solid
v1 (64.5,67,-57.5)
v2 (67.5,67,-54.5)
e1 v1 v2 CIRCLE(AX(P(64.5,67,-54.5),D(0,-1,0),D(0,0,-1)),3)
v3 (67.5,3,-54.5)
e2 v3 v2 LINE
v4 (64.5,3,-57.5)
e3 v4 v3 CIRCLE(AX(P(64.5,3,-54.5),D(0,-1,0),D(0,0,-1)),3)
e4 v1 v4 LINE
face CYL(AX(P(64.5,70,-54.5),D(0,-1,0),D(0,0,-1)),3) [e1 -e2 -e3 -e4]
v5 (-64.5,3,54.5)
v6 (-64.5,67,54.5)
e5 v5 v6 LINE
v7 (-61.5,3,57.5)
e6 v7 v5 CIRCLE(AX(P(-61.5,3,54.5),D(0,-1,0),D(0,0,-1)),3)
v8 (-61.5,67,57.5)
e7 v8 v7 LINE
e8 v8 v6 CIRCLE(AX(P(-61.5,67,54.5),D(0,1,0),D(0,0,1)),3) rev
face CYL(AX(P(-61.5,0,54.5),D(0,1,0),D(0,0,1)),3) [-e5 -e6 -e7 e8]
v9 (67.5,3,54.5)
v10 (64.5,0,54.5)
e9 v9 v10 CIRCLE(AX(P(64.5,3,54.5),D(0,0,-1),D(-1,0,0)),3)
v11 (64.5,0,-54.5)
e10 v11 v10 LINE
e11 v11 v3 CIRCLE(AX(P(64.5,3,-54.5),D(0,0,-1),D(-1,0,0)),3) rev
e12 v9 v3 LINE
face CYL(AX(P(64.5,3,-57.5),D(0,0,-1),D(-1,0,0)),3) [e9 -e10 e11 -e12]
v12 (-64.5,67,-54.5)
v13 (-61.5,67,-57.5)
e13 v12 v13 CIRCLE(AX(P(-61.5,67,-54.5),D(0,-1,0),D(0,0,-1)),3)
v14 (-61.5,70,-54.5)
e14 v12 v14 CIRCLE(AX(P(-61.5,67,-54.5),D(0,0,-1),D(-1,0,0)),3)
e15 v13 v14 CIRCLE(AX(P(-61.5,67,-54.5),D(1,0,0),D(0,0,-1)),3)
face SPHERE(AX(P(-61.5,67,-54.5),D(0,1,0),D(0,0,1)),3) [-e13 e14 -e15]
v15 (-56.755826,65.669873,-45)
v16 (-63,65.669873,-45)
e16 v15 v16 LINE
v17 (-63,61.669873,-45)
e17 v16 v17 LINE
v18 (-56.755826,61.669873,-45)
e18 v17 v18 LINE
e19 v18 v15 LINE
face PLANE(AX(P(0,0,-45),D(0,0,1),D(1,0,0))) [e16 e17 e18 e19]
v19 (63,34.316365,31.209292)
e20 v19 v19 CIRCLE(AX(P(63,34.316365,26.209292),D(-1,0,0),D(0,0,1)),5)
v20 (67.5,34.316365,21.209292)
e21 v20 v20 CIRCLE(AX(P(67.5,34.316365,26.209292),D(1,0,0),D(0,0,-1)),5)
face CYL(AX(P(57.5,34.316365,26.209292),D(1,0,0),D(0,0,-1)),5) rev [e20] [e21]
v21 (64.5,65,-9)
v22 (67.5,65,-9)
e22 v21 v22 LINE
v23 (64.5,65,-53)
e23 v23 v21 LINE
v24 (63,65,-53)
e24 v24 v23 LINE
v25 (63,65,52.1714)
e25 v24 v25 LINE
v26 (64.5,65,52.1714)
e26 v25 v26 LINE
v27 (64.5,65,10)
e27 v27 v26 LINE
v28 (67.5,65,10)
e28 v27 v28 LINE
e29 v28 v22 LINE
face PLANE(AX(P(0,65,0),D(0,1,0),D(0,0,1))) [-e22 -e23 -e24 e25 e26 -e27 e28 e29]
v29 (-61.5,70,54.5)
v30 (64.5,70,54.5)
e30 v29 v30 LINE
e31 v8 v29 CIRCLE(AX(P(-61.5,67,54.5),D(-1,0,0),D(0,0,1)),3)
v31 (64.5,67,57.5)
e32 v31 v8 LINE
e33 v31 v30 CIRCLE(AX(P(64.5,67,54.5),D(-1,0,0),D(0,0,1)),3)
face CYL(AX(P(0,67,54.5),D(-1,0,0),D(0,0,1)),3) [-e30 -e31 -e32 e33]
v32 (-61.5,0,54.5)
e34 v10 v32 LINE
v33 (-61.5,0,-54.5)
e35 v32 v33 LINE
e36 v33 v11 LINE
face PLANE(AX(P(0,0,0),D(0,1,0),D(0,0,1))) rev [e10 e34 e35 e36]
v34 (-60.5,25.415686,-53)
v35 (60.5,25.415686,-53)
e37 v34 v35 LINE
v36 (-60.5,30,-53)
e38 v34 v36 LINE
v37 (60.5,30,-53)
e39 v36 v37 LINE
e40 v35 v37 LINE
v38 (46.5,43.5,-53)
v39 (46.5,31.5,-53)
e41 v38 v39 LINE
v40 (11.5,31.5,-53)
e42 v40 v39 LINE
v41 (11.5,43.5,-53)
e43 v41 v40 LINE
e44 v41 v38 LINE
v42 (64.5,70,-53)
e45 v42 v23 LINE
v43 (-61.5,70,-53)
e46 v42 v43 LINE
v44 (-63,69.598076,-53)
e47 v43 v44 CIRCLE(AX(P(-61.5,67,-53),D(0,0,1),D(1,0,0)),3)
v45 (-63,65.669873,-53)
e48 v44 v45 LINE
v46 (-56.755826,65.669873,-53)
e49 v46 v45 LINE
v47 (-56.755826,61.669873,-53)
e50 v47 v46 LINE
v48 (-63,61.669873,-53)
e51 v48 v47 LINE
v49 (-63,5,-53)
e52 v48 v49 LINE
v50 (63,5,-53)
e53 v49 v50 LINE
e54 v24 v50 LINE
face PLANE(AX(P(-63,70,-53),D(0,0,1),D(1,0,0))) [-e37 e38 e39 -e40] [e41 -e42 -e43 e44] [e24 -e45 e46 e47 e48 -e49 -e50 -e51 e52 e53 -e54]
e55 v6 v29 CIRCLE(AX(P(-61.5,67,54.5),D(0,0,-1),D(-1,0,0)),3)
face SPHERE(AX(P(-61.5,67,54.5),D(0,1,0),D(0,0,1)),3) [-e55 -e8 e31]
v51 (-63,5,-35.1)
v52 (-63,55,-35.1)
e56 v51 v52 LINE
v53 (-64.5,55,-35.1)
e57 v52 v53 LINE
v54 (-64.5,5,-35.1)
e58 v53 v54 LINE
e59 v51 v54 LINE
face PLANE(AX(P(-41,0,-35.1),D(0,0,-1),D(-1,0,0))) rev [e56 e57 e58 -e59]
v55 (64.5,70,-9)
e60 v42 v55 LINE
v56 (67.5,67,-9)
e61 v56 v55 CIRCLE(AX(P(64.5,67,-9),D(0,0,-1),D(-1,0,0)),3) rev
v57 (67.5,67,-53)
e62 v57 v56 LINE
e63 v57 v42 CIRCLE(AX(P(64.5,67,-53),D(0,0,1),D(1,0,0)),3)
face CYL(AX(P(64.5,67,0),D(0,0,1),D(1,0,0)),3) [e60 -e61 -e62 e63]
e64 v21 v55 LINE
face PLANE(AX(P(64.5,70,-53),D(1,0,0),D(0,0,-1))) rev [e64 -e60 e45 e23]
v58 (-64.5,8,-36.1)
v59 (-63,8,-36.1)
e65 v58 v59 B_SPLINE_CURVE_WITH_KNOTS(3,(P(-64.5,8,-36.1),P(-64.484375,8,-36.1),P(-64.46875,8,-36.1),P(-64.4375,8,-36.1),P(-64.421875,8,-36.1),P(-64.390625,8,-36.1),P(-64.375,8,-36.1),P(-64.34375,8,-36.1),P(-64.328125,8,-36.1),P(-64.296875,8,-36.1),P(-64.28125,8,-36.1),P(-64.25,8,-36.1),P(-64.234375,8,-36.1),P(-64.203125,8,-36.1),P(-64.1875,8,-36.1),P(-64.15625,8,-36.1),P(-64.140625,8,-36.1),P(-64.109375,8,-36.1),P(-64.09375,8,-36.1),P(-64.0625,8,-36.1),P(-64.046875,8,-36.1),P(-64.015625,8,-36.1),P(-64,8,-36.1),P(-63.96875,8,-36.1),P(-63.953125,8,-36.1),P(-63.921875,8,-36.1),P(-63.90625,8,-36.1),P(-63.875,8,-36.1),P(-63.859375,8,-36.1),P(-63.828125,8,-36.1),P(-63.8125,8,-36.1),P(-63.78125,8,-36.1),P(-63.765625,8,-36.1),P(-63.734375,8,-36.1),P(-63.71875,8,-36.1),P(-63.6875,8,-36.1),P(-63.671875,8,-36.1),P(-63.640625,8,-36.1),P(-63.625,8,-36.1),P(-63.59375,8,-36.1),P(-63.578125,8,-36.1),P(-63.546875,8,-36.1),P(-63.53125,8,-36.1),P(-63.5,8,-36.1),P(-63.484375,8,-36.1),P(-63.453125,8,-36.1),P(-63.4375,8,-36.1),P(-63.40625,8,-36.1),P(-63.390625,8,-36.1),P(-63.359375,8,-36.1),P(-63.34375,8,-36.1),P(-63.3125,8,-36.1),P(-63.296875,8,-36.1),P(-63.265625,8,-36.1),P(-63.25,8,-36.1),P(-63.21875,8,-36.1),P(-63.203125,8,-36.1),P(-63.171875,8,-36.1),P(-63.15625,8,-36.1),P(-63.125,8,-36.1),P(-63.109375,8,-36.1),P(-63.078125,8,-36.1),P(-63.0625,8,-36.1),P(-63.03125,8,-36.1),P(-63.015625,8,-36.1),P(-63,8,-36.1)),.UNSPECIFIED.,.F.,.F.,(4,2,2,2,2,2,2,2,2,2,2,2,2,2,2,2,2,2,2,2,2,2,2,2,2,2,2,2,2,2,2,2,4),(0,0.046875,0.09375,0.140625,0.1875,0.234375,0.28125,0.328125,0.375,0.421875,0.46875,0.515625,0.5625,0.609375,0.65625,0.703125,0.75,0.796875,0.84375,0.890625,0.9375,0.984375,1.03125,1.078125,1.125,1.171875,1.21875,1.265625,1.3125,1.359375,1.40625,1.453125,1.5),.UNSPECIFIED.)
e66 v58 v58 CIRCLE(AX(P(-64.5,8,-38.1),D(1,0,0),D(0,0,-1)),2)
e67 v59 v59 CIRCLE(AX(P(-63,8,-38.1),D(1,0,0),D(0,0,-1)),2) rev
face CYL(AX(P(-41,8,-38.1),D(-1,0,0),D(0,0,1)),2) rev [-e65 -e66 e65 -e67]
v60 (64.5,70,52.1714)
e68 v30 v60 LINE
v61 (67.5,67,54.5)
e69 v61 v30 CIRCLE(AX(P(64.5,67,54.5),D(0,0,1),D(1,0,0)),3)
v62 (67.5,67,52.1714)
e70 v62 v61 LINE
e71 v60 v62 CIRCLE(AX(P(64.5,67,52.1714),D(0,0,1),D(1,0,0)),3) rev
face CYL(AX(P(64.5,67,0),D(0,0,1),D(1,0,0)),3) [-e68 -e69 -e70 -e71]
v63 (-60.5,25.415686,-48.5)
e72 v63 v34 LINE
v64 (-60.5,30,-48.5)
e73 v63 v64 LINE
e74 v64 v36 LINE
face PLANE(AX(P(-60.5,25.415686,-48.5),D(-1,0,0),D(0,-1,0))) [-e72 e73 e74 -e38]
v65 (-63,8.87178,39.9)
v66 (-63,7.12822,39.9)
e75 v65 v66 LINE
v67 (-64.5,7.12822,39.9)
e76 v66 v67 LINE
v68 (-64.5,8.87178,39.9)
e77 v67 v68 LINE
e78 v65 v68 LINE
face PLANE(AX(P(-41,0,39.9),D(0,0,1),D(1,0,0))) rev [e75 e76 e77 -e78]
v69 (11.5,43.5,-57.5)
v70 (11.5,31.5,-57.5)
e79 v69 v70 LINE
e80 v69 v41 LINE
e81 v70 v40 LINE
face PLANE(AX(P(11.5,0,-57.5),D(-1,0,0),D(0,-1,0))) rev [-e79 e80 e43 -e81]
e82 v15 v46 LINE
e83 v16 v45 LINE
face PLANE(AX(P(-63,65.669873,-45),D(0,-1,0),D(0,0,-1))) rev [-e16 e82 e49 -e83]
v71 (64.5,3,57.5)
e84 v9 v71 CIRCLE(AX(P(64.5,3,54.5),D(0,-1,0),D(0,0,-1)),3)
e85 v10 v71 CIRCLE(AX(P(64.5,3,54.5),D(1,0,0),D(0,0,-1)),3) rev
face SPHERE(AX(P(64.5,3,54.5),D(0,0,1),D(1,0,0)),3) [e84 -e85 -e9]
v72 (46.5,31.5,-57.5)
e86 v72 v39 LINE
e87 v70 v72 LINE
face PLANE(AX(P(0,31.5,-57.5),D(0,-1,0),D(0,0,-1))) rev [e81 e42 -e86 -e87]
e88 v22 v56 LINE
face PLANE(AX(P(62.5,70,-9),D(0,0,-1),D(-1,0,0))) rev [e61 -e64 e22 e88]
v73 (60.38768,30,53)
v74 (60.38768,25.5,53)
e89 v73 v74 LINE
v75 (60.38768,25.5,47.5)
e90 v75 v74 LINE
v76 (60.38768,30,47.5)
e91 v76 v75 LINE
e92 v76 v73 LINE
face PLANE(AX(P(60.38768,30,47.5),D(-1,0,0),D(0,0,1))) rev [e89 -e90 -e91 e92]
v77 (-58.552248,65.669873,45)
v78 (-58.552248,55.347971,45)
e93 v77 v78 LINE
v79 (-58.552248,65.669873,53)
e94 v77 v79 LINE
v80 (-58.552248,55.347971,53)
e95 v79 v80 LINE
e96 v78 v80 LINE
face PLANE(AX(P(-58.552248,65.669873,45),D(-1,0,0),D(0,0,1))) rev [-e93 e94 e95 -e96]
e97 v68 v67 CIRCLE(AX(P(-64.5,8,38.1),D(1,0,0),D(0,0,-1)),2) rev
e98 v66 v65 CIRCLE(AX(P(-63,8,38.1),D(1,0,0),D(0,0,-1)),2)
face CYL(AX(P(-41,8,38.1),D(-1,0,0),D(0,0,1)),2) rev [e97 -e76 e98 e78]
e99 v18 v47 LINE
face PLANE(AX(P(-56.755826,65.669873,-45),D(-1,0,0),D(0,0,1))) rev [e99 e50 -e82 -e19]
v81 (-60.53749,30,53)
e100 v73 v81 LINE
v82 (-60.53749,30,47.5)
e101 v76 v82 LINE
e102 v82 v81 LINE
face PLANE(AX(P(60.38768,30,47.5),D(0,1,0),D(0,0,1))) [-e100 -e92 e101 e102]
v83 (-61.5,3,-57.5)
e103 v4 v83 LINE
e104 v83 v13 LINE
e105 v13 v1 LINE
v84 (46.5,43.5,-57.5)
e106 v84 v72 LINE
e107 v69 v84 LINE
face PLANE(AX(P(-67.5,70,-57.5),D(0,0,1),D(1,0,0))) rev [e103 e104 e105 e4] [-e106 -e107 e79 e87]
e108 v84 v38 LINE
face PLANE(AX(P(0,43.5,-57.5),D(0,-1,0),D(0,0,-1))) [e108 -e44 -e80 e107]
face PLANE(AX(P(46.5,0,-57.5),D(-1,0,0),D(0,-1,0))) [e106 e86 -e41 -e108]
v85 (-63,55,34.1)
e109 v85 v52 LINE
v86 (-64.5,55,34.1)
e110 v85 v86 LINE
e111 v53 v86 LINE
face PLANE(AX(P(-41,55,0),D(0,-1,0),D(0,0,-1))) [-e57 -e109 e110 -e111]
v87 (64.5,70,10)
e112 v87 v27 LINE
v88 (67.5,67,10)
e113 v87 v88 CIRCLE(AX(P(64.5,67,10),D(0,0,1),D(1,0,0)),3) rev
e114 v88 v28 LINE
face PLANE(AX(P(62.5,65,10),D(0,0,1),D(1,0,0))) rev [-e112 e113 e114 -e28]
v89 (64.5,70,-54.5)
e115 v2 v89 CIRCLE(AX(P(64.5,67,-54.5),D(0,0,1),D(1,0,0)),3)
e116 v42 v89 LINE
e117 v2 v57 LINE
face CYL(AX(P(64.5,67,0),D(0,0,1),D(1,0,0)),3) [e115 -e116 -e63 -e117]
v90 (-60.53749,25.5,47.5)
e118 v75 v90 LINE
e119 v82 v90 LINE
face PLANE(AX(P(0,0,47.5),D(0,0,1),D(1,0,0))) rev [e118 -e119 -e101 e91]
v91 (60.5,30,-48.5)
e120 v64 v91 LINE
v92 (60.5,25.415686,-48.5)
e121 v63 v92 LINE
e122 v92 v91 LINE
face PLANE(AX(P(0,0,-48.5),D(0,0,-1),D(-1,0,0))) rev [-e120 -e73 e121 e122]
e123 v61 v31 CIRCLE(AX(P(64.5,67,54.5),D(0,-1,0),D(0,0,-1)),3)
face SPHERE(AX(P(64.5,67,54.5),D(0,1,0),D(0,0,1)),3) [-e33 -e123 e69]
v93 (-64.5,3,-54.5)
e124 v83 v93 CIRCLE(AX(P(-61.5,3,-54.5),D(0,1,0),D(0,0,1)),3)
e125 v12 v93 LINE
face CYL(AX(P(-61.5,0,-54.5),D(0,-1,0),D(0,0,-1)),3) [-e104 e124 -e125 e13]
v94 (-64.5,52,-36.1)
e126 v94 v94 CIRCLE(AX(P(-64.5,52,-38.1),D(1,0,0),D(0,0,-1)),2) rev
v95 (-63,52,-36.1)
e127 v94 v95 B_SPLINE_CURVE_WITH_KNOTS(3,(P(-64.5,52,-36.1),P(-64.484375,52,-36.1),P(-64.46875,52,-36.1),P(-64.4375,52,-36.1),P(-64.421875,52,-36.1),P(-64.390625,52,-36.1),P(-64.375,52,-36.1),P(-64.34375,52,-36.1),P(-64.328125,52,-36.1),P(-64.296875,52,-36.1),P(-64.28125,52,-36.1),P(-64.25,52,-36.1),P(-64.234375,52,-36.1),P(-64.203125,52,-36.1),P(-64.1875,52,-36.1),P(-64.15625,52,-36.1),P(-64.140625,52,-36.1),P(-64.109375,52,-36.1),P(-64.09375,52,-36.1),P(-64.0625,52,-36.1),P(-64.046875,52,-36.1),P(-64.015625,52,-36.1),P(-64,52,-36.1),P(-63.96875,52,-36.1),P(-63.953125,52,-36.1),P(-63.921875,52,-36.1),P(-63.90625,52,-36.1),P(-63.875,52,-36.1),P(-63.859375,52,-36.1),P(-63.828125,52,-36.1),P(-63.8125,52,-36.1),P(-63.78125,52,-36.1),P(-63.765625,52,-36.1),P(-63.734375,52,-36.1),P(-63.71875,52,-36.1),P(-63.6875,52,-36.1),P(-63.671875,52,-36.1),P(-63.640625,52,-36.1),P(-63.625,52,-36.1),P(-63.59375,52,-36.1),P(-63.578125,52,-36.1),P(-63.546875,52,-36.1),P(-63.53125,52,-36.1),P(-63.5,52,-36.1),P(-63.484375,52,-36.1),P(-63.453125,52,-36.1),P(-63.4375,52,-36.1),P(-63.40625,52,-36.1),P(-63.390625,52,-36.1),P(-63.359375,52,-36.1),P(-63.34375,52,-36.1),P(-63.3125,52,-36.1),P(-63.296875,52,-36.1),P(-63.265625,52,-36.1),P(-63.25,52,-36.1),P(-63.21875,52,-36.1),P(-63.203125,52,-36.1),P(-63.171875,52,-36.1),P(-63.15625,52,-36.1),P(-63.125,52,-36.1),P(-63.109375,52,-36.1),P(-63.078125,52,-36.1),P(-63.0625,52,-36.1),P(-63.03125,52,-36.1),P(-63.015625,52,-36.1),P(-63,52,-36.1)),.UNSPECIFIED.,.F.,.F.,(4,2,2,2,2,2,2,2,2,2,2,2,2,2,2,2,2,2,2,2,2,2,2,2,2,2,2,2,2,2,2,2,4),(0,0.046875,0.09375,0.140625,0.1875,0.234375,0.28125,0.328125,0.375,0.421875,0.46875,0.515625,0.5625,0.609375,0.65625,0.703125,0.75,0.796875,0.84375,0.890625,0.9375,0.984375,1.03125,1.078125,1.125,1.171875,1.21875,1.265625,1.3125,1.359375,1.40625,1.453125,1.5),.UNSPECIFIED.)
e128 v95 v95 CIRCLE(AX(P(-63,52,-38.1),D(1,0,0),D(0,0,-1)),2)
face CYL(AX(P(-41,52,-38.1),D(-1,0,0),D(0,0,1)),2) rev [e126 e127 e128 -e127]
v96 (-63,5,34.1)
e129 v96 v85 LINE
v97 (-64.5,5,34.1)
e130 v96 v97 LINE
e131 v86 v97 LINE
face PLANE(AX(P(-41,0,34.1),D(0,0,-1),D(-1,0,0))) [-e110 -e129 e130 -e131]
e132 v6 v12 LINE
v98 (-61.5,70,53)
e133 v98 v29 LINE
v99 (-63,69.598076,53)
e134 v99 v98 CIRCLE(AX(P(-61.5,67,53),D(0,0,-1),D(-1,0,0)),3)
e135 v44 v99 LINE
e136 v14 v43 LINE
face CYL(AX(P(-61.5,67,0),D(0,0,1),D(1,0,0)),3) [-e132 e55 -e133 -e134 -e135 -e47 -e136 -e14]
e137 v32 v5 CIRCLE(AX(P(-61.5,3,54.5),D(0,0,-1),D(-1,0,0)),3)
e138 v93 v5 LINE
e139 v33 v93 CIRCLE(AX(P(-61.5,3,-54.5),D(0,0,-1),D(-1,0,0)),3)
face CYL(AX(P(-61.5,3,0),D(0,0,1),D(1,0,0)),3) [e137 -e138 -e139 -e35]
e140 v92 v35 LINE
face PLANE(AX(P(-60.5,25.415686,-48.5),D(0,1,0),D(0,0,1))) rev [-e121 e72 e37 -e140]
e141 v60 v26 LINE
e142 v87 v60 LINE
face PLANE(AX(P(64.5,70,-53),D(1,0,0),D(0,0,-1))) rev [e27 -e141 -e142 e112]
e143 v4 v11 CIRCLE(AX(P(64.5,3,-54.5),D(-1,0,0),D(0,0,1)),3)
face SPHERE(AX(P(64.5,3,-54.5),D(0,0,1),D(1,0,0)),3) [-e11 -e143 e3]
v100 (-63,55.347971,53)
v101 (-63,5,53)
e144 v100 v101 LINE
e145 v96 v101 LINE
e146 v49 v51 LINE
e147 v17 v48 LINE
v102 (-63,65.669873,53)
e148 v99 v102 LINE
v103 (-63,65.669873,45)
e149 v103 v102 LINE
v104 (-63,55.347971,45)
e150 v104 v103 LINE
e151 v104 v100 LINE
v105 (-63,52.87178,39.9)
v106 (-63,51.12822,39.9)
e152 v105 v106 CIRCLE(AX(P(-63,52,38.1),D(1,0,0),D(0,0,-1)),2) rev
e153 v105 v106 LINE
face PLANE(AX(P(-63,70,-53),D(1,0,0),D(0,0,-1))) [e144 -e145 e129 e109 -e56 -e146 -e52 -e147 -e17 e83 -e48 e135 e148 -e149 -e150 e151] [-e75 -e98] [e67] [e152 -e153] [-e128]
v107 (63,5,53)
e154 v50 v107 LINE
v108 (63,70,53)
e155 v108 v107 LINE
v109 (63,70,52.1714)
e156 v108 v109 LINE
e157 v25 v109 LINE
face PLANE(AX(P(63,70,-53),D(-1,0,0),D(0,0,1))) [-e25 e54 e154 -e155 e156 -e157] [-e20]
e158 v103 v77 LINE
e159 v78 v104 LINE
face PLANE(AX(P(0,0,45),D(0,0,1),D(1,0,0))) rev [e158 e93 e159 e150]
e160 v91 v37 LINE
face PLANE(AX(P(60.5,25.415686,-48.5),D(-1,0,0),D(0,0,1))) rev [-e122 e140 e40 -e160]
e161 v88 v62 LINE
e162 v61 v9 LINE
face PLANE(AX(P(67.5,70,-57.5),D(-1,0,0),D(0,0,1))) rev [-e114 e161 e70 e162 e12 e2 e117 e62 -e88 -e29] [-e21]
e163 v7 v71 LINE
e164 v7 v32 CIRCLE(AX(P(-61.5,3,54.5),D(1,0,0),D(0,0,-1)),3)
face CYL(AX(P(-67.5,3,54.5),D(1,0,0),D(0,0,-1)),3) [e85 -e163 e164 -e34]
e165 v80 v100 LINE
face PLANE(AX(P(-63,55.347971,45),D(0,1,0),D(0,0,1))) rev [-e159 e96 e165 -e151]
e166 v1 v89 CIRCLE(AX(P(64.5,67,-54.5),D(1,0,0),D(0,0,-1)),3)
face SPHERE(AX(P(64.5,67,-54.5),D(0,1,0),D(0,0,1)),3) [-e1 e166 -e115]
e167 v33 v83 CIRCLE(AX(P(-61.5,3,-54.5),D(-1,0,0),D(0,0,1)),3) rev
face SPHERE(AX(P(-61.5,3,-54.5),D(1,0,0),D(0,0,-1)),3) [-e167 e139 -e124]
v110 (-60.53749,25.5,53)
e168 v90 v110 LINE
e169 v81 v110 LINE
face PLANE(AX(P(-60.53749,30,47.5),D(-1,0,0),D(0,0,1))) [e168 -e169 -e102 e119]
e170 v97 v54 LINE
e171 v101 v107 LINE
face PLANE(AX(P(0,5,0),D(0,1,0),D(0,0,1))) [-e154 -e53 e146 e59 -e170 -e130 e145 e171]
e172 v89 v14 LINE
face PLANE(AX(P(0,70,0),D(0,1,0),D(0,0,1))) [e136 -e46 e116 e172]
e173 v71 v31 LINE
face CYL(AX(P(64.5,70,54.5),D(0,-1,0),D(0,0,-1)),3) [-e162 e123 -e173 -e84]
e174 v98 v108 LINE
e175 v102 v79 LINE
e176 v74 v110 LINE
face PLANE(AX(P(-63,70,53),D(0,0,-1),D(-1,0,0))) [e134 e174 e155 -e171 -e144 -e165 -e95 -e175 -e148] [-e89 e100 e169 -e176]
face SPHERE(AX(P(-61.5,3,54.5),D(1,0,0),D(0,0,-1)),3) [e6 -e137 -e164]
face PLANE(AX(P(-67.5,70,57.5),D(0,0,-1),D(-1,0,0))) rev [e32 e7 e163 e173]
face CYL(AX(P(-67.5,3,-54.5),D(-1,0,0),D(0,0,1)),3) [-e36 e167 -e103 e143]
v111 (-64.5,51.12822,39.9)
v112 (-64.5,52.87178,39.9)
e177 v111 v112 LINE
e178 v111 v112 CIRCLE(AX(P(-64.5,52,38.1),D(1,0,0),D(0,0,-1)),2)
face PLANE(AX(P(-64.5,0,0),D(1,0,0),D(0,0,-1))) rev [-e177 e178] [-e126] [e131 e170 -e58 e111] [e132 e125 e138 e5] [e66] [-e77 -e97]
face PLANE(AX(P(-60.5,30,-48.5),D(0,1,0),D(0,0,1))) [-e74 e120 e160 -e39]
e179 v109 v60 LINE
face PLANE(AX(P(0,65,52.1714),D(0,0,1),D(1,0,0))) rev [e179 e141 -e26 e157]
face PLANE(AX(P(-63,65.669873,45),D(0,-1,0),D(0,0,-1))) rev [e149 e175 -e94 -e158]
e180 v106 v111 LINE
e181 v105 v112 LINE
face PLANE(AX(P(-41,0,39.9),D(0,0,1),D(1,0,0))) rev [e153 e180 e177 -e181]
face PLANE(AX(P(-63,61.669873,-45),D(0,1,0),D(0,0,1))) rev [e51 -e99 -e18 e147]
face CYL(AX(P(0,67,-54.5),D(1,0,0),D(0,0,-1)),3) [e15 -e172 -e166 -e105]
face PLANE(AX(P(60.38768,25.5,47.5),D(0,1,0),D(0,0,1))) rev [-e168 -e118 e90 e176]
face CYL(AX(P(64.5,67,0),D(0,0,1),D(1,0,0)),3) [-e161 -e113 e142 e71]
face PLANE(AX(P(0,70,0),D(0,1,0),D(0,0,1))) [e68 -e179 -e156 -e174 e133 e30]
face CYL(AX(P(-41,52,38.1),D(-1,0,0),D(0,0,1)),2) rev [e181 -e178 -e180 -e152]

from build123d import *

# Parameters (mm, degrees)
SKETCH2_W           = 135
SKETCH2_H           = 115
SKETCH2_W_2         = 126
SKETCH2_H_2         = 106
BOSS_EXTRUDE1_DEPTH = 70
SKETCH2_2_W         = 126
SKETCH2_2_H         = 106
BOSS_EXTRUDE2_DEPTH = 5
SKETCH3_W           = 121
SKETCH3_H           = 4.584314329
BOSS_EXTRUDE3_DEPTH = 4.5
SKETCH3_3_W         = 35
SKETCH3_3_H         = 12
CUT_EXTRUDE1_DEPTH  = 148.195448299
SKETCH11_W          = 69.2
SKETCH11_H          = 50
SKETCH11_R          = 2
CUT_EXTRUDE3_DEPTH  = 26.5
SKETCH21_R          = 5
CUT_EXTRUDE7_DEPTH  = 10
SKETCH12_W          = 4.5
SKETCH12_H          = 105.171400209
CUT_EXTRUDE4_DEPTH  = 5
SKETCH15_W          = 115
SKETCH15_H          = 70
CUT_EXTRUDE6_DEPTH  = 3
SKETCH17_W          = 120.925170316
SKETCH17_H          = 4.5
BOSS_EXTRUDE5_DEPTH = 5.5
FILLET1_R           = 3
FILLET2_R           = 3
FILLET3_R           = 3
SKETCH22_W          = 3
SKETCH22_H          = 105.171400209
BOSS_EXTRUDE8_DEPTH = 5
SKETCH14_W          = 19
SKETCH14_H          = 5
CUT_EXTRUDE5_DEPTH  = 5
SKETCH19_W          = 6.24417403
SKETCH19_H          = 4
BOSS_EXTRUDE6_DEPTH = 8
SKETCH20_W          = 4.447751713
SKETCH20_H          = 10.321902288
BOSS_EXTRUDE7_DEPTH = 8
FILLET5_R           = 3
FILLET6_R           = 3


# Some blends are built 0.0001 mm under size
with BuildPart() as part:
    # Sketch2 → Boss-Extrude1 (new body)
    with BuildSketch(Plane(origin=(0, 0, 0), x_dir=(1, 0, 0), z_dir=(0, 1, 0))):
        Rectangle(SKETCH2_W, SKETCH2_H)
        Rectangle(SKETCH2_W_2, SKETCH2_H_2, mode=Mode.SUBTRACT)
    extrude(amount=BOSS_EXTRUDE1_DEPTH)

    # Sketch2<2> → Boss-Extrude2 (add)
    with BuildSketch(Plane(origin=(0, 0, 0), x_dir=(1, 0, 0), z_dir=(0, 1, 0))):
        Rectangle(SKETCH2_2_W, SKETCH2_2_H)
    extrude(amount=BOSS_EXTRUDE2_DEPTH)

    # Sketch3 → Boss-Extrude3 (add)
    with BuildSketch(Plane.XY.offset(-53)):
        with Locations((0, 27.707842836)):
            Rectangle(SKETCH3_W, SKETCH3_H)
    extrude(amount=BOSS_EXTRUDE3_DEPTH)

    # Sketch3<3> → Cut-Extrude1 (cut, through all)
    with BuildSketch(Plane.XY.offset(-53)):
        with Locations((29, 37.5)):
            Rectangle(SKETCH3_3_W, SKETCH3_3_H)
    extrude(amount=-CUT_EXTRUDE1_DEPTH, mode=Mode.SUBTRACT)

    # Sketch11 → Cut-Extrude3 (cut)
    with BuildSketch(Plane.ZY.offset(67.5)):
        with Locations((-0.5, 30)):
            Rectangle(SKETCH11_W, SKETCH11_H)
        with BuildLine():
            ThreePointArc((39.9, 8.871779789), (36.1, 8), (39.9, 7.128220211))
            Line((39.9, 7.128220211), (39.9, 8.871779789))
        make_face()
        with BuildLine():
            Line((39.9, 51.128220211), (39.9, 52.871779789))
            ThreePointArc((39.9, 52.871779789), (36.1, 52), (39.9, 51.128220211))
        make_face()
        with Locations((-38.1, 52)):
            Circle(SKETCH11_R)
        with Locations((-38.1, 8)):
            Circle(SKETCH11_R)
    extrude(amount=-CUT_EXTRUDE3_DEPTH, mode=Mode.SUBTRACT)

    # Sketch21 → Cut-Extrude7 (cut)
    with BuildSketch(Plane(origin=(67.5, 0, 0), x_dir=(0, 0, -1), z_dir=(1, 0, 0))):
        with Locations((-26.20929228, 34.316365245)):
            Circle(SKETCH21_R)
    extrude(amount=-CUT_EXTRUDE7_DEPTH, mode=Mode.SUBTRACT)

    # Sketch12 → Cut-Extrude4 (cut)
    with BuildSketch(Plane(origin=(0, 70, 0), x_dir=(1, 0, 0), z_dir=(0, 1, 0))):
        with Locations((65.25, 0.414299895)):
            Rectangle(SKETCH12_W, SKETCH12_H)
    extrude(amount=-CUT_EXTRUDE4_DEPTH, mode=Mode.SUBTRACT)

    # Sketch15 → Cut-Extrude6 (cut)
    with BuildSketch(Plane.ZY.offset(67.5)):
        with Locations((0, 35)):
            Rectangle(SKETCH15_W, SKETCH15_H)
    extrude(amount=-CUT_EXTRUDE6_DEPTH, mode=Mode.SUBTRACT)

    # Sketch17 → Boss-Extrude5 (add)
    with BuildSketch(Plane(origin=(0, 0, 53), x_dir=(-1, 0, 0), z_dir=(0, 0, -1))):
        with Locations((0.074904723, 27.75)):
            Rectangle(SKETCH17_W, SKETCH17_H)
    extrude(amount=BOSS_EXTRUDE5_DEPTH)

    # Fillet1
    fillet1_edges = [part.edges().sort_by_distance(p)[0] for p in [
        (1.5, 0, 57.5),
        (1.5, 0, -57.5),
        (67.5, 0, 0),
    ]]
    fillet(fillet1_edges, radius=FILLET1_R)

    # Fillet2
    # the kernel refuses this fillet: 3 mm, written as the material it takes off along each edge
    with BuildSketch(Plane(origin=(64.5, 3, 54.5), x_dir=(0, 0, 1), z_dir=(1, 0, 0))) as fillet2_piece_1_section:
        Polygon((0, 0), (FILLET2_R, 0), (FILLET2_R, FILLET2_R), (0, FILLET2_R), align=None)
    fillet2_piece_1 = extrude(amount=FILLET2_R, mode=Mode.PRIVATE)
    fillet2_piece_1 = fillet2_piece_1 - Plane(origin=(64.5, 3, 54.5), x_dir=(0, 0.7071067811865475, -0.7071067811865475), z_dir=(1, 0, 0)) * Sphere(FILLET2_R, mode=Mode.PRIVATE)
    add(fillet2_piece_1, mode=Mode.SUBTRACT)
    with BuildSketch(Plane(origin=(64.5, 3, -54.5), x_dir=(1, 0, 0), z_dir=(0, 0, -1))) as fillet2_piece_2_section:
        Polygon((0, 0), (FILLET2_R, 0), (FILLET2_R, FILLET2_R), (0, FILLET2_R), align=None)
    fillet2_piece_2 = extrude(amount=FILLET2_R, mode=Mode.PRIVATE)
    fillet2_piece_2 = fillet2_piece_2 - Plane(origin=(64.5, 3, -54.5), x_dir=(-0.7071067811865475, 0.7071067811865475, 0), z_dir=(0, 0, -1)) * Sphere(FILLET2_R, mode=Mode.PRIVATE)
    add(fillet2_piece_2, mode=Mode.SUBTRACT)
    with BuildSketch(Plane(origin=(-64.5, 77.5, -57.5), x_dir=(1, 0, 0), z_dir=(0, -1, 0)), Plane(origin=(67.5, 3, 57.5), x_dir=(0, 0, -1), z_dir=(0, 1, 0)), Plane(origin=(67.5, 3, -57.5), x_dir=(-1, 0, 0), z_dir=(0, 1, 0))) as fillet2_piece_3:
        with BuildLine():
            CenterArc((FILLET2_R, FILLET2_R), FILLET2_R, 180, 90)
            Line((0, FILLET2_R), (0, 0))
            Line((0, 0), (FILLET2_R, 0))
        make_face()
    extrude(amount=74.5, mode=Mode.SUBTRACT)
    with BuildSketch(Plane(origin=(-64.5, 0, -54.5), x_dir=(0, 1, 0), z_dir=(0, 0, 1))) as fillet2_piece_4:
        with BuildLine():
            CenterArc((FILLET2_R, -FILLET2_R), FILLET2_R, 90, 90)
            Line((0, -FILLET2_R), (0, 0))
            Line((0, 0), (FILLET2_R, 0))
        make_face()
    extrude(amount=109, mode=Mode.SUBTRACT)
    with BuildSketch(Plane(origin=(-64.5, 3, 57.5), x_dir=(0, 0, -1), z_dir=(0, 1, 0))) as fillet2_piece_5:
        with BuildLine():
            CenterArc((FILLET2_R, -FILLET2_R), FILLET2_R, 90, 90)
            Line((0, -FILLET2_R), (0, 0))
            Line((0, 0), (FILLET2_R, 0))
        make_face()
    extrude(amount=74.5, mode=Mode.SUBTRACT)
    with BuildSketch(Plane(origin=(-64.5, 3, -54.5), x_dir=(0, 0, -1), z_dir=(0, 1, 0))) as fillet2_piece_6:
        with BuildLine():
            CenterArc((3 - FILLET2_R, -FILLET2_R), FILLET2_R, 0, 90)
            Line((3 - FILLET2_R, 0), (3, 0))
            Line((3, 0), (3, -FILLET2_R))
        make_face()
    revolve(axis=Axis((-64.5, 3, -54.5), (-1, 0, 0)), revolution_arc=90, mode=Mode.SUBTRACT)
    with BuildSketch(Plane(origin=(-64.5, 3, 54.5), x_dir=(0, -1, 0), z_dir=(0, 0, -1))) as fillet2_piece_7:
        with BuildLine():
            CenterArc((3 - FILLET2_R, -FILLET2_R), FILLET2_R, 360, 90)
            Line((3, -FILLET2_R), (3, 0))
            Line((3, 0), (3 - FILLET2_R, 0))
        make_face()
    revolve(axis=Axis((-64.5, 3, 54.5), (-1, 0, 0)), revolution_arc=90, mode=Mode.SUBTRACT)

    # Fillet3
    # the kernel refuses this fillet: 3 mm, written as the material it takes off along each edge
    with BuildSketch(Plane(origin=(67.5, 70, -54.5), x_dir=(-1, 0, 0), z_dir=(0, 0, 1))) as fillet3_piece_1:
        with BuildLine():
            CenterArc((FILLET3_R, FILLET3_R), FILLET3_R, 180, 90)
            Line((0, FILLET3_R), (0, 0))
            Line((0, 0), (FILLET3_R, 0))
        make_face()
    extrude(amount=9, mode=Mode.SUBTRACT)
    with BuildSketch(Plane(origin=(64.5, 70, -54.5), x_dir=(0, 0, -1), z_dir=(-1, 0, 0))) as fillet3_piece_2:
        with BuildLine():
            CenterArc((3 - FILLET3_R, FILLET3_R), FILLET3_R, 270, 90)
            Line((3 - FILLET3_R, 0), (3, 0))
            Line((3, 0), (3, FILLET3_R))
        make_face()
    revolve(axis=Axis((64.5, 70, -54.5), (0, -1, 0)), revolution_arc=90, mode=Mode.SUBTRACT)
    with BuildSketch(Plane(origin=(-61.5, 70, -57.5), x_dir=(0, -1, 0), z_dir=(1, 0, 0))) as fillet3_piece_3:
        with BuildLine():
            CenterArc((FILLET3_R, -FILLET3_R), FILLET3_R, 90, 90)
            Line((0, -FILLET3_R), (0, 0))
            Line((0, 0), (FILLET3_R, 0))
        make_face()
    extrude(amount=126, mode=Mode.SUBTRACT)
    with BuildSketch(Plane(origin=(-61.5, 70, -54.5), x_dir=(0, 0, -1), z_dir=(1, 0, 0))) as fillet3_piece_4:
        with BuildLine():
            CenterArc((3 - FILLET3_R, -FILLET3_R), FILLET3_R, 0, 90)
            Line((3, -FILLET3_R), (3, 0))
            Line((3, 0), (3 - FILLET3_R, 0))
        make_face()
    revolve(axis=Axis((-61.5, 70, -54.5), (0, 1, 0)), revolution_arc=90, mode=Mode.SUBTRACT)
    with BuildSketch(Plane(origin=(-64.5, 70, 54.5), x_dir=(1, 0, 0), z_dir=(0, 0, -1))) as fillet3_piece_5:
        with BuildLine():
            CenterArc((FILLET3_R, FILLET3_R), FILLET3_R, 180, 90)
            Line((0, FILLET3_R), (0, 0))
            Line((0, 0), (FILLET3_R, 0))
        make_face()
    extrude(amount=109, mode=Mode.SUBTRACT)
    with BuildSketch(Plane(origin=(-61.5, 70, 54.5), x_dir=(0, 0, 1), z_dir=(1, 0, 0))) as fillet3_piece_6:
        with BuildLine():
            CenterArc((3 - FILLET3_R, FILLET3_R), FILLET3_R, 270, 90)
            Line((3, FILLET3_R), (3, 0))
            Line((3, 0), (3 - FILLET3_R, 0))
        make_face()
    revolve(axis=Axis((-61.5, 70, 54.5), (0, -1, 0)), revolution_arc=90, mode=Mode.SUBTRACT)
    with BuildSketch(Plane(origin=(64.5, 70, 57.5), x_dir=(0, 0, -1), z_dir=(-1, 0, 0))) as fillet3_piece_7:
        with BuildLine():
            CenterArc((FILLET3_R, FILLET3_R), FILLET3_R, 180, 90)
            Line((0, FILLET3_R), (0, 0))
            Line((0, 0), (FILLET3_R, 0))
        make_face()
    extrude(amount=126, mode=Mode.SUBTRACT)
    with BuildSketch(Plane(origin=(64.5, 70, 54.5), x_dir=(1, 0, 0), z_dir=(0, 0, -1))) as fillet3_piece_8:
        with BuildLine():
            CenterArc((3 - FILLET3_R, FILLET3_R), FILLET3_R, 270, 90)
            Line((3, FILLET3_R), (3, 0))
            Line((3, 0), (3 - FILLET3_R, 0))
        make_face()
    revolve(axis=Axis((64.5, 70, 54.5), (0, -1, 0)), revolution_arc=90, mode=Mode.SUBTRACT)
    with BuildSketch(Plane(origin=(67.5, 70, 44.671400209), x_dir=(-1, 0, 0), z_dir=(0, 0, 1))) as fillet3_piece_9:
        with BuildLine():
            CenterArc((FILLET3_R, FILLET3_R), FILLET3_R, 180, 90)
            Line((0, FILLET3_R), (0, 0))
            Line((0, 0), (FILLET3_R, 0))
        make_face()
    extrude(amount=9.828599791, mode=Mode.SUBTRACT)

    # Sketch22 → Boss-Extrude8 (add)
    with BuildSketch(Plane(origin=(0, 65, 0), x_dir=(1, 0, 0), z_dir=(0, 1, 0))):
        with Locations((66, 0.414299895)):
            Rectangle(SKETCH22_W, SKETCH22_H)
    extrude(amount=BOSS_EXTRUDE8_DEPTH)

    # Sketch14 → Cut-Extrude5 (cut)
    with BuildSketch(Plane(origin=(67.5, 0, 0), x_dir=(0, 0, -1), z_dir=(1, 0, 0))):
        with Locations((-0.5, 67.5)):
            Rectangle(SKETCH14_W, SKETCH14_H)
    extrude(amount=-CUT_EXTRUDE5_DEPTH, mode=Mode.SUBTRACT)

    # Sketch19 → Boss-Extrude6 (add)
    with BuildSketch(Plane.XY.offset(-53)):
        with Locations((-59.877912985, 63.669872981)):
            Rectangle(SKETCH19_W, SKETCH19_H)
    extrude(amount=BOSS_EXTRUDE6_DEPTH)

    # Sketch20 → Boss-Extrude7 (add)
    with BuildSketch(Plane(origin=(0, 0, 53), x_dir=(-1, 0, 0), z_dir=(0, 0, -1))):
        with Locations((60.776124144, 60.508921837)):
            Rectangle(SKETCH20_W, SKETCH20_H)
    extrude(amount=BOSS_EXTRUDE7_DEPTH)

    # Fillet5
    fillet5_edges = [part.edges().sort_by_distance(p)[0] for p in [
        (67.5, 70, 31.085700105),
    ]]
    fillet(fillet5_edges, radius=FILLET5_R - 0.0001)  # a hair under: the kernel refuses the full size

    # Fillet6
    fillet6_edges = [part.edges().sort_by_distance(p)[0] for p in [
        (67.5, 70, -31),
    ]]
    fillet(fillet6_edges, radius=FILLET6_R - 0.0001)  # a hair under: the kernel refuses the full size


solid = part.part
